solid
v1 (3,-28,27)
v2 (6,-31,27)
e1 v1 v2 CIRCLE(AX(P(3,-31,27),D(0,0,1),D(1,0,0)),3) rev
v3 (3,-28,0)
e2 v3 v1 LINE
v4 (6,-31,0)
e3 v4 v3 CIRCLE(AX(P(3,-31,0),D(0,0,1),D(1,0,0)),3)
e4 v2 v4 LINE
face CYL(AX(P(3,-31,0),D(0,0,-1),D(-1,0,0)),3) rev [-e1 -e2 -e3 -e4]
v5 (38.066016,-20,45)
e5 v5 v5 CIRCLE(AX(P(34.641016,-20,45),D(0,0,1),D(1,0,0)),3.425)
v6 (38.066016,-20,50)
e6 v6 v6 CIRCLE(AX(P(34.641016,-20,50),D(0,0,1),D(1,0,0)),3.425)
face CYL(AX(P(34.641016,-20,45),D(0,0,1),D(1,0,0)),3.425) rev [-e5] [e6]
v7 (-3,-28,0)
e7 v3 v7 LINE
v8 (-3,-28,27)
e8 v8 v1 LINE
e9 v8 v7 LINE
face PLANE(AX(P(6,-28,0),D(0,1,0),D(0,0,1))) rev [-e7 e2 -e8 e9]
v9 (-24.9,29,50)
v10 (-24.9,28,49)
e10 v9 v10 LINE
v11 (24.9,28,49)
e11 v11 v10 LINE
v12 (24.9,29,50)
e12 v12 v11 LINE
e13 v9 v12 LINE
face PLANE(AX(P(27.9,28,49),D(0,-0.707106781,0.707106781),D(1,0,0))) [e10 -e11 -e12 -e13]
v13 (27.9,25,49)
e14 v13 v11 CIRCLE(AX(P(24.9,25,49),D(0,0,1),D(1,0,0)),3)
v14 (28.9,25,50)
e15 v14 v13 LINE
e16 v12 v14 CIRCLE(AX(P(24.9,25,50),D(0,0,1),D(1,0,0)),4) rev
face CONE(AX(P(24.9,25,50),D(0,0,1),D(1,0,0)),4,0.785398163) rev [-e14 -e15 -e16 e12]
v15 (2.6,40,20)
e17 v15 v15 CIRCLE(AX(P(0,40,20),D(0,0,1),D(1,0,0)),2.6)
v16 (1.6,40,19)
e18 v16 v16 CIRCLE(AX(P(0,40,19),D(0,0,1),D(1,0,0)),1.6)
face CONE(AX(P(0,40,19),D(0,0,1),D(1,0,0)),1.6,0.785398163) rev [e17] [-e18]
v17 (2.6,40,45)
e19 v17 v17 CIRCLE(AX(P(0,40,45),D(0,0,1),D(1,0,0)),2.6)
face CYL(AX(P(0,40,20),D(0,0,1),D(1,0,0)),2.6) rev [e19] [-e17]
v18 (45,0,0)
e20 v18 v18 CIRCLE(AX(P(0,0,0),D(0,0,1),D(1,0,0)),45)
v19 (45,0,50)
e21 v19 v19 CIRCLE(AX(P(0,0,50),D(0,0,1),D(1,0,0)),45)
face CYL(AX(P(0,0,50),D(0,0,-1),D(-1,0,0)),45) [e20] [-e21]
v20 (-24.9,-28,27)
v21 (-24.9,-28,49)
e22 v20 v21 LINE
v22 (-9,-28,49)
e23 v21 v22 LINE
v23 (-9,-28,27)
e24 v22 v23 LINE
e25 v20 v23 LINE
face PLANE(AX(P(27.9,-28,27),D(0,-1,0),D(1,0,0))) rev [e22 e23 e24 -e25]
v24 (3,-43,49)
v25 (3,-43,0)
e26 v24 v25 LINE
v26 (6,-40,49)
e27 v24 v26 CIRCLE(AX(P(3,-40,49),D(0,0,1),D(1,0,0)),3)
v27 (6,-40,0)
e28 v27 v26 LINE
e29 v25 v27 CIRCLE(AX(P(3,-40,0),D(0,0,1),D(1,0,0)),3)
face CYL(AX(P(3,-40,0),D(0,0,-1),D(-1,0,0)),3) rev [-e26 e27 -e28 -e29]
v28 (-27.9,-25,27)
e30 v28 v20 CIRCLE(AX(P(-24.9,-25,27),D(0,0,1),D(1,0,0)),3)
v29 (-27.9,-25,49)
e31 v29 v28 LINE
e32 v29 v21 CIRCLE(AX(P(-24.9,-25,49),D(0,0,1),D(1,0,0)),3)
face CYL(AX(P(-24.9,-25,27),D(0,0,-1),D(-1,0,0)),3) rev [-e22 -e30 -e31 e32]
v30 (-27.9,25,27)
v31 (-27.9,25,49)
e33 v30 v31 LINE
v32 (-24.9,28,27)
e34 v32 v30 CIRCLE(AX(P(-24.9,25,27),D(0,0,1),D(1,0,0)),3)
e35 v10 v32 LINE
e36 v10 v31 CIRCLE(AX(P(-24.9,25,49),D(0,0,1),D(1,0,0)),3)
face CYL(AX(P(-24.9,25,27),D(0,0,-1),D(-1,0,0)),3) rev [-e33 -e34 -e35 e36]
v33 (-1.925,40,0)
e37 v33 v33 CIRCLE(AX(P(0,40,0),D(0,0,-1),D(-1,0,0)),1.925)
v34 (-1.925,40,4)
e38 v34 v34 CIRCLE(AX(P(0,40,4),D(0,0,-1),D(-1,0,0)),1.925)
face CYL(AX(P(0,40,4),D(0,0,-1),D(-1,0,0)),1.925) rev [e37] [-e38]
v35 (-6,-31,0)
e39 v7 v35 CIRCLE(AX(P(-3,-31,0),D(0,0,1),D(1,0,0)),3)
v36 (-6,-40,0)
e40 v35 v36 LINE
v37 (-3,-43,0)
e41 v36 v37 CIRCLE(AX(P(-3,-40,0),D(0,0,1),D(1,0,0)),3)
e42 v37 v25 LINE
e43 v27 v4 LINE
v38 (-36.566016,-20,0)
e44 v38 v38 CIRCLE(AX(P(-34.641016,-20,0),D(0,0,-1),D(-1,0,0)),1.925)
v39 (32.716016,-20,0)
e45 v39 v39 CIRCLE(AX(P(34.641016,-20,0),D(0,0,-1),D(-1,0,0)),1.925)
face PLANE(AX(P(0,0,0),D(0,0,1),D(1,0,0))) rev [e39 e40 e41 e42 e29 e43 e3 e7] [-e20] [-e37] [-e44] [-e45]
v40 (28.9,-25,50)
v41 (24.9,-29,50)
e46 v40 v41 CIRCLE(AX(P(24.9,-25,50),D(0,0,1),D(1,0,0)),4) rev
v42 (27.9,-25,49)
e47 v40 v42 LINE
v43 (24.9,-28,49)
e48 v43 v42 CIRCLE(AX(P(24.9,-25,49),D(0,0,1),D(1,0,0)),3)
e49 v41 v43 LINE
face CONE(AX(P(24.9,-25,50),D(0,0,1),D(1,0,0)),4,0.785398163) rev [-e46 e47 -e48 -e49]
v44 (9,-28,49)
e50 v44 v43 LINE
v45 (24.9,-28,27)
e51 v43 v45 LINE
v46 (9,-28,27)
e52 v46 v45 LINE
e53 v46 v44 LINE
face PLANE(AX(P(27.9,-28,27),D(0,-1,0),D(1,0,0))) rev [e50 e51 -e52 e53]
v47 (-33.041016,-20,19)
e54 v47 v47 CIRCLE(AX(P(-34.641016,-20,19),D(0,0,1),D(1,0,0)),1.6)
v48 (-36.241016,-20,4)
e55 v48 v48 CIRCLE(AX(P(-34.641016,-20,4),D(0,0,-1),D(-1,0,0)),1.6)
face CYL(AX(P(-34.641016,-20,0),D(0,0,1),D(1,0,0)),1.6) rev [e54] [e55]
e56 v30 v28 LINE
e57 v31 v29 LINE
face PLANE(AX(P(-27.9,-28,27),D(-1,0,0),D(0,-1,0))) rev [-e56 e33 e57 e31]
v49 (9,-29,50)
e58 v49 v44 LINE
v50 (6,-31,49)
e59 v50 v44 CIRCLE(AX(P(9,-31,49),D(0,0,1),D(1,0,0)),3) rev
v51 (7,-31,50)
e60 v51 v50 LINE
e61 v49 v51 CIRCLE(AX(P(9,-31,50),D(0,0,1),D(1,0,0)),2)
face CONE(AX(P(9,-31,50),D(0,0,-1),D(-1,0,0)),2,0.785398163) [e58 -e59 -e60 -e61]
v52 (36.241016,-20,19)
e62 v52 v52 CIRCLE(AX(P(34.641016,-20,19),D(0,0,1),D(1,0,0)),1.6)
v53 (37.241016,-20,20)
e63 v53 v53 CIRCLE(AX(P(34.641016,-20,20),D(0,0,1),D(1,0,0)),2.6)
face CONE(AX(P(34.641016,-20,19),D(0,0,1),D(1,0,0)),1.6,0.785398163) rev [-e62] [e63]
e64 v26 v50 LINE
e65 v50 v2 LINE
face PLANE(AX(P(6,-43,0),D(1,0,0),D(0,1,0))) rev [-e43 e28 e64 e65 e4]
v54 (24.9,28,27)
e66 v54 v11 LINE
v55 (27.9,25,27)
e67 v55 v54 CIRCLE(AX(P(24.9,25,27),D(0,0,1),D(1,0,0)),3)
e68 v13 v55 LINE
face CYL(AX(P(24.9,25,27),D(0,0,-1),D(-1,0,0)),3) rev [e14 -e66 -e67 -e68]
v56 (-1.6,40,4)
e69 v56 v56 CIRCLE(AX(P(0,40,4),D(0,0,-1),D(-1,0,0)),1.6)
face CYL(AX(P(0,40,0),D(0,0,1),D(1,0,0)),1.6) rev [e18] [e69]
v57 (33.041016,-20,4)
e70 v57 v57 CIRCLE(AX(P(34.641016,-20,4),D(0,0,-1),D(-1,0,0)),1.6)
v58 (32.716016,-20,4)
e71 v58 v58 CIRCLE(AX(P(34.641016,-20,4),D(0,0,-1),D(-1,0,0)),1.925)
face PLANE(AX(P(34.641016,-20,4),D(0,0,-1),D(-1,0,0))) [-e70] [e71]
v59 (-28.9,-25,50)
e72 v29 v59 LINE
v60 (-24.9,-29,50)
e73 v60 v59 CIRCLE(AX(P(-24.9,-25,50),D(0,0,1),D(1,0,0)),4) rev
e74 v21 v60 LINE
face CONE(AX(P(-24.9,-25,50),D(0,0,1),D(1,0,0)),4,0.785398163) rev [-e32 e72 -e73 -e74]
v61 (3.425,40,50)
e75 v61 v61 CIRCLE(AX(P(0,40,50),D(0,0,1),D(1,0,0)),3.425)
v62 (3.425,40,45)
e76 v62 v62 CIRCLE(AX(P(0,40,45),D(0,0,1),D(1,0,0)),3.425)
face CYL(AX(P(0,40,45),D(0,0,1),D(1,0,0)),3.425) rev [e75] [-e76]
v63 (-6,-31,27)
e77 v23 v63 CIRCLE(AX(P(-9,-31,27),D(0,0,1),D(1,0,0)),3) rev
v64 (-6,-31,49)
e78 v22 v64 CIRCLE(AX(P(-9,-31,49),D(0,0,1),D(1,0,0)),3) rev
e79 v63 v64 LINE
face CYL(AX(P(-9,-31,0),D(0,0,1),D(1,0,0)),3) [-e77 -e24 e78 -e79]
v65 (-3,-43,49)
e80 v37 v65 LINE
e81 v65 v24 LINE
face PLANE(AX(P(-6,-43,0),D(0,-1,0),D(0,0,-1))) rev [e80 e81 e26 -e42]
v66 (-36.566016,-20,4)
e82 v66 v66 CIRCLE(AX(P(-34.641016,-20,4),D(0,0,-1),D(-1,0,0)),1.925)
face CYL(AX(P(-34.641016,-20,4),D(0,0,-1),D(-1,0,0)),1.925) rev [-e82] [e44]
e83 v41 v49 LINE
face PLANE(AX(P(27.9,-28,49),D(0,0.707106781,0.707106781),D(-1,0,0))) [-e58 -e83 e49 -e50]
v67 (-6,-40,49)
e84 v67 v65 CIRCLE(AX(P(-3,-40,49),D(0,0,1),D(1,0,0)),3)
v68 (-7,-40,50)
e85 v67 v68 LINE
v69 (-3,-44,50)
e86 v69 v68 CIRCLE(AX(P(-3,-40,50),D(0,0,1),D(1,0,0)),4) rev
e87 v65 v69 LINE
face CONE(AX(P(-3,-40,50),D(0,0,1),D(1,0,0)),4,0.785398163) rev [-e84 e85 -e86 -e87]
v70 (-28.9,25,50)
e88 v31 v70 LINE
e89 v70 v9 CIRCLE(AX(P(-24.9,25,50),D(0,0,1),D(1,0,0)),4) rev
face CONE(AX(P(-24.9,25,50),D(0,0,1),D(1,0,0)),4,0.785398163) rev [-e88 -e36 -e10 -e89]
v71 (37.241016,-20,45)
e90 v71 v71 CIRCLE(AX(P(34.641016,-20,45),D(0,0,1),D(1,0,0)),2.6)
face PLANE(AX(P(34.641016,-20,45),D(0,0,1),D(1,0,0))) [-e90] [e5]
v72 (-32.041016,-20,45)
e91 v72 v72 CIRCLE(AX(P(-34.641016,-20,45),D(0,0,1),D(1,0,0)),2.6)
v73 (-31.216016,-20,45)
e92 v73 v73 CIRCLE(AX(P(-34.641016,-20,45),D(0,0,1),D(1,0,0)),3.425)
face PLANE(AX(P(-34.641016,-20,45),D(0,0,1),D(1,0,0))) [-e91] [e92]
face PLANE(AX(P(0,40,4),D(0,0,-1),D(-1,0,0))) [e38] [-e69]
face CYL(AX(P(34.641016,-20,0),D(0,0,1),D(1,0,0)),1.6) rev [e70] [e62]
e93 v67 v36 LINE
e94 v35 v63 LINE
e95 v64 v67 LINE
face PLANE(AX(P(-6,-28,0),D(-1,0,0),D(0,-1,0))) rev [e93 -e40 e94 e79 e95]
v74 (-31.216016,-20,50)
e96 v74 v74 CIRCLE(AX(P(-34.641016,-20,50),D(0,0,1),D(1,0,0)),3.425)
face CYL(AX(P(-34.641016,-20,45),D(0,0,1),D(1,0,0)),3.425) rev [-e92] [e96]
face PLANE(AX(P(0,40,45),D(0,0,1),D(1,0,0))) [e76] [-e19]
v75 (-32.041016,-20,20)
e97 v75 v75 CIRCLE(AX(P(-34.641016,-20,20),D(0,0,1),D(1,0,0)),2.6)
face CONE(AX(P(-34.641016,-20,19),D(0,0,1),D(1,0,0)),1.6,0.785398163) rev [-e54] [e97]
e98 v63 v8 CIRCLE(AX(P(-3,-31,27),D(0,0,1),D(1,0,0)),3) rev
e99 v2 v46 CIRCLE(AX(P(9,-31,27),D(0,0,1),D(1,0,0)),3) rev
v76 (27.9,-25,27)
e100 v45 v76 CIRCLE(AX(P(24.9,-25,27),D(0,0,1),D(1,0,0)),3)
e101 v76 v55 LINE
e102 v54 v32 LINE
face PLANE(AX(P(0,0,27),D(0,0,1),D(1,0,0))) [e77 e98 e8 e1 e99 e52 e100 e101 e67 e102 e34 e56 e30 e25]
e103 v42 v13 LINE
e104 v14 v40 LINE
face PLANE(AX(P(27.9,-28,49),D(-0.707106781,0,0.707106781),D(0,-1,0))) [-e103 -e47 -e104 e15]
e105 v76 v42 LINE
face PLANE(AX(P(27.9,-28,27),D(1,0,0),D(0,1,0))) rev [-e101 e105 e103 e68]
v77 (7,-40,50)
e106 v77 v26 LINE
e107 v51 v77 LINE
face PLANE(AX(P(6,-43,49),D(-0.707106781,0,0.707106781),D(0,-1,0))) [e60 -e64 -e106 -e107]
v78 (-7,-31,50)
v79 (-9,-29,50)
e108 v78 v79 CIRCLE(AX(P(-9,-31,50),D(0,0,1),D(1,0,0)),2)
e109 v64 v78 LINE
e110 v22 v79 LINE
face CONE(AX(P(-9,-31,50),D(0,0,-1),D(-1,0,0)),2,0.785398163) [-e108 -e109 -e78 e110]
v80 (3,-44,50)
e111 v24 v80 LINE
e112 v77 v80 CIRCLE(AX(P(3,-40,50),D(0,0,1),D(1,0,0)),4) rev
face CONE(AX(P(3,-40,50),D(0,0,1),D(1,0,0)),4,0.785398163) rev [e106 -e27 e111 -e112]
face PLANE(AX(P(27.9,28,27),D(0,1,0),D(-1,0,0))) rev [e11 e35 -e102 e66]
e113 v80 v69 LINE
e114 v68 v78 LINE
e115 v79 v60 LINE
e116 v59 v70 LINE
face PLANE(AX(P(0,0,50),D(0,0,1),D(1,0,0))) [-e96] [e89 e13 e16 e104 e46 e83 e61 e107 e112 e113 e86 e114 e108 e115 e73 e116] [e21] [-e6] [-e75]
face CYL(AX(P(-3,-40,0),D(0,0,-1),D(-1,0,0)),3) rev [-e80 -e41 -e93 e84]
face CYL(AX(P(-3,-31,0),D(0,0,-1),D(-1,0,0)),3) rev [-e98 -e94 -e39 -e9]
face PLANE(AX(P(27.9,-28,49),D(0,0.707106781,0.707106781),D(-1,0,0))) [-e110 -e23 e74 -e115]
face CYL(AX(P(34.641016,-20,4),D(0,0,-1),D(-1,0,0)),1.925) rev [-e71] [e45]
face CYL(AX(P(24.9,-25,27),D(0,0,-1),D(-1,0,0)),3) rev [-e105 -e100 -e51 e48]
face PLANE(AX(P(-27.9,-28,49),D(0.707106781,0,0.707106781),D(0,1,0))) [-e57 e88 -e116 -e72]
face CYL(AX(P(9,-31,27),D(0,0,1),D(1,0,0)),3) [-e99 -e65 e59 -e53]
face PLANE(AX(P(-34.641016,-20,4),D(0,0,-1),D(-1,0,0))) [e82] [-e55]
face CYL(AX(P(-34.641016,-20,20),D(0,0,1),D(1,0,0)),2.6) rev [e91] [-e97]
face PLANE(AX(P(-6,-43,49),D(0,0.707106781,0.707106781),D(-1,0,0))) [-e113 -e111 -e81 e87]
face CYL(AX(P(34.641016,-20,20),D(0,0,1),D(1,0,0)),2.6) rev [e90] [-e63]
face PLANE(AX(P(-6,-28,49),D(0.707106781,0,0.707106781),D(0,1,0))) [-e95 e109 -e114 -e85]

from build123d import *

# Parameters (mm, degrees)
ESQUISSE1_R             = 45
BOSS_EXTRU_1_DEPTH      = 50
ESQUISSE2_W             = 55.8
ESQUISSE2_H             = 56
ENL_V_MAT_EXTRU_1_DEPTH = 23
CONG_1_R                = 3
ESQUISSE3_W             = 12
ESQUISSE3_H             = 15
ENL_V_MAT_EXTRU_2_DEPTH = 81.932070281
CONG_2_R                = 3
CONG_3_R                = 3
CHANFREIN1_SIZE         = 1
ESQUISSE5_R             = 1.6
ENL_V_MAT_EXTRU_3_DEPTH = 81.932070281
ESQUISSE6_R             = 3.425
ESQUISSE6_R_2           = 1.6
ENL_V_MAT_EXTRU_4_DEPTH = 5
ESQUISSE7_R             = 2.6
ESQUISSE7_R_2           = 1.6
ENL_V_MAT_EXTRU_5_DEPTH = 30
CHANFREIN2_SIZE         = 1
ENL_V_START             = -4
ESQUISSE8_R             = 1.925
ESQUISSE8_R_2           = 1.6
ENL_V_MAT_EXTRU_6_DEPTH = 4


with BuildPart() as part:
    # Esquisse1 → Boss.-Extru.1 (new body)
    with BuildSketch(Plane.XY):
        Circle(ESQUISSE1_R)
    extrude(amount=BOSS_EXTRU_1_DEPTH)

    # Esquisse2 → Enlèv. mat.-Extru.1 (cut)
    with BuildSketch(Plane.XY.offset(50)):
        Rectangle(ESQUISSE2_W, ESQUISSE2_H)
    extrude(amount=-ENL_V_MAT_EXTRU_1_DEPTH, mode=Mode.SUBTRACT)

    # Congé1
    cong_1_edges = [part.edges().sort_by_distance(p)[0] for p in [
        (-27.9, -28, 38.5),
        (-27.9, 28, 38.5),
        (27.9, 28, 38.5),
        (27.9, -28, 38.5),
    ]]
    fillet(cong_1_edges, radius=CONG_1_R)

    # Esquisse3 → Enlèv. mat.-Extru.2 (cut, through all)
    with BuildSketch(Plane.XY.offset(50)):
        with Locations((0, -35.5)):
            Rectangle(ESQUISSE3_W, ESQUISSE3_H)
    extrude(amount=-ENL_V_MAT_EXTRU_2_DEPTH, mode=Mode.SUBTRACT)

    # Congé2
    cong_2_edges = [part.edges().sort_by_distance(p)[0] for p in [
        (-6, -28, 38.5),
        (6, -28, 38.5),
        (6, -43, 25),
        (-6, -43, 25),
    ]]
    fillet(cong_2_edges, radius=CONG_2_R)

    # Congé3
    cong_3_edges = [part.edges().sort_by_distance(p)[0] for p in [
        (6, -28, 13.5),
        (-6, -28, 13.5),
    ]]
    fillet(cong_3_edges, radius=CONG_3_R)

    # Chanfrein1
    chanfrein1_edges = [part.edges().sort_by_distance(p)[0] for p in [
        (27.9, 0, 50),
        (-16.95, -28, 50),
        (-27.9, 0, 50),
        (0, 28, 50),
        (27.021320344, -27.121320344, 50),
        (-27.021320344, -27.121320344, 50),
        (-27.021320344, 27.121320344, 50),
        (27.021320344, 27.121320344, 50),
        (16.95, -28, 50),
        (6, -35.5, 50),
        (0, -43, 50),
        (-6, -35.5, 50),
        (-6.878679656, -28.878679656, 50),
        (6.878679656, -28.878679656, 50),
        (5.121320344, -42.121320344, 50),
        (-5.121320344, -42.121320344, 50),
    ]]
    chamfer(chanfrein1_edges, length=CHANFREIN1_SIZE)

    # Esquisse5 → Enlèv. mat.-Extru.3 (cut, through all)
    with BuildSketch(Plane.XY.offset(50)):
        with Locations((-34.641016151, -20)):
            Circle(ESQUISSE5_R)
        with Locations((0, 40)):
            Circle(ESQUISSE5_R)
        with Locations((34.641016151, -20)):
            Circle(ESQUISSE5_R)
    extrude(amount=-ENL_V_MAT_EXTRU_3_DEPTH, mode=Mode.SUBTRACT)

    # Esquisse6 → Enlèv. mat.-Extru.4 (cut)
    # profile 1 of 3: a face of its own
    with BuildSketch(Plane.XY.offset(50)):
        with Locations((-34.641016151, -20)):
            Circle(ESQUISSE6_R)
        with Locations((-34.641016151, -20)):
            Circle(ESQUISSE6_R_2, mode=Mode.SUBTRACT)
    # profile 2 of 3: a face of its own
    with BuildSketch(Plane.XY.offset(50)):
        with Locations((0, 40)):
            Circle(ESQUISSE6_R)
        with Locations((0, 40)):
            Circle(ESQUISSE6_R_2, mode=Mode.SUBTRACT)
    # profile 3 of 3: a face of its own
    with BuildSketch(Plane.XY.offset(50)):
        with Locations((34.641016151, -20)):
            Circle(ESQUISSE6_R)
        with Locations((34.641016151, -20)):
            Circle(ESQUISSE6_R_2, mode=Mode.SUBTRACT)
    extrude(amount=-ENL_V_MAT_EXTRU_4_DEPTH, mode=Mode.SUBTRACT)

    # Esquisse7 → Enlèv. mat.-Extru.5 (cut)
    # profile 1 of 3: a face of its own
    with BuildSketch(Plane.XY.offset(50)):
        with Locations((-34.641016151, -20)):
            Circle(ESQUISSE7_R)
        with Locations((-34.641016151, -20)):
            Circle(ESQUISSE7_R_2, mode=Mode.SUBTRACT)
    # profile 2 of 3: a face of its own
    with BuildSketch(Plane.XY.offset(50)):
        with Locations((0, 40)):
            Circle(ESQUISSE7_R)
        with Locations((0, 40)):
            Circle(ESQUISSE7_R_2, mode=Mode.SUBTRACT)
    # profile 3 of 3: a face of its own
    with BuildSketch(Plane.XY.offset(50)):
        with Locations((34.641016151, -20)):
            Circle(ESQUISSE7_R)
        with Locations((34.641016151, -20)):
            Circle(ESQUISSE7_R_2, mode=Mode.SUBTRACT)
    extrude(amount=-ENL_V_MAT_EXTRU_5_DEPTH, mode=Mode.SUBTRACT)

    # Chanfrein2
    chanfrein2_edges = [part.edges().sort_by_distance(p)[0] for p in [
        (-36.241016151, -20, 20),
        (-1.6, 40, 20),
        (33.041016151, -20, 20),
    ]]
    chamfer(chanfrein2_edges, length=CHANFREIN2_SIZE - 0.0001)  # a hair under: the kernel refuses the full size

    # Esquisse8 → Enlèv. mat.-Extru.6 (cut)
    # profile 1 of 3: a face of its own
    with BuildSketch(Plane(origin=(0, 0, 0), x_dir=(-1, 0, 0), z_dir=(0, 0, -1)).offset(ENL_V_START)):
        with Locations((-34.641016151, -20)):
            Circle(ESQUISSE8_R)
        with Locations(Location((-34.641016151, -20, 0), (0, 0, 180))):
            Circle(ESQUISSE8_R_2, mode=Mode.SUBTRACT)
    # profile 2 of 3: a face of its own
    with BuildSketch(Plane(origin=(0, 0, 0), x_dir=(-1, 0, 0), z_dir=(0, 0, -1)).offset(ENL_V_START)):
        with Locations((0, 40)):
            Circle(ESQUISSE8_R)
        with Locations(Location((0, 40, 0), (0, 0, 180))):
            Circle(ESQUISSE8_R_2, mode=Mode.SUBTRACT)
    # profile 3 of 3: a face of its own
    with BuildSketch(Plane(origin=(0, 0, 0), x_dir=(-1, 0, 0), z_dir=(0, 0, -1)).offset(ENL_V_START)):
        with Locations((34.641016151, -20)):
            Circle(ESQUISSE8_R)
        with Locations(Location((34.641016151, -20, 0), (0, 0, 180))):
            Circle(ESQUISSE8_R_2, mode=Mode.SUBTRACT)
    extrude(amount=ENL_V_MAT_EXTRU_6_DEPTH, mode=Mode.SUBTRACT)


solid = part.part
